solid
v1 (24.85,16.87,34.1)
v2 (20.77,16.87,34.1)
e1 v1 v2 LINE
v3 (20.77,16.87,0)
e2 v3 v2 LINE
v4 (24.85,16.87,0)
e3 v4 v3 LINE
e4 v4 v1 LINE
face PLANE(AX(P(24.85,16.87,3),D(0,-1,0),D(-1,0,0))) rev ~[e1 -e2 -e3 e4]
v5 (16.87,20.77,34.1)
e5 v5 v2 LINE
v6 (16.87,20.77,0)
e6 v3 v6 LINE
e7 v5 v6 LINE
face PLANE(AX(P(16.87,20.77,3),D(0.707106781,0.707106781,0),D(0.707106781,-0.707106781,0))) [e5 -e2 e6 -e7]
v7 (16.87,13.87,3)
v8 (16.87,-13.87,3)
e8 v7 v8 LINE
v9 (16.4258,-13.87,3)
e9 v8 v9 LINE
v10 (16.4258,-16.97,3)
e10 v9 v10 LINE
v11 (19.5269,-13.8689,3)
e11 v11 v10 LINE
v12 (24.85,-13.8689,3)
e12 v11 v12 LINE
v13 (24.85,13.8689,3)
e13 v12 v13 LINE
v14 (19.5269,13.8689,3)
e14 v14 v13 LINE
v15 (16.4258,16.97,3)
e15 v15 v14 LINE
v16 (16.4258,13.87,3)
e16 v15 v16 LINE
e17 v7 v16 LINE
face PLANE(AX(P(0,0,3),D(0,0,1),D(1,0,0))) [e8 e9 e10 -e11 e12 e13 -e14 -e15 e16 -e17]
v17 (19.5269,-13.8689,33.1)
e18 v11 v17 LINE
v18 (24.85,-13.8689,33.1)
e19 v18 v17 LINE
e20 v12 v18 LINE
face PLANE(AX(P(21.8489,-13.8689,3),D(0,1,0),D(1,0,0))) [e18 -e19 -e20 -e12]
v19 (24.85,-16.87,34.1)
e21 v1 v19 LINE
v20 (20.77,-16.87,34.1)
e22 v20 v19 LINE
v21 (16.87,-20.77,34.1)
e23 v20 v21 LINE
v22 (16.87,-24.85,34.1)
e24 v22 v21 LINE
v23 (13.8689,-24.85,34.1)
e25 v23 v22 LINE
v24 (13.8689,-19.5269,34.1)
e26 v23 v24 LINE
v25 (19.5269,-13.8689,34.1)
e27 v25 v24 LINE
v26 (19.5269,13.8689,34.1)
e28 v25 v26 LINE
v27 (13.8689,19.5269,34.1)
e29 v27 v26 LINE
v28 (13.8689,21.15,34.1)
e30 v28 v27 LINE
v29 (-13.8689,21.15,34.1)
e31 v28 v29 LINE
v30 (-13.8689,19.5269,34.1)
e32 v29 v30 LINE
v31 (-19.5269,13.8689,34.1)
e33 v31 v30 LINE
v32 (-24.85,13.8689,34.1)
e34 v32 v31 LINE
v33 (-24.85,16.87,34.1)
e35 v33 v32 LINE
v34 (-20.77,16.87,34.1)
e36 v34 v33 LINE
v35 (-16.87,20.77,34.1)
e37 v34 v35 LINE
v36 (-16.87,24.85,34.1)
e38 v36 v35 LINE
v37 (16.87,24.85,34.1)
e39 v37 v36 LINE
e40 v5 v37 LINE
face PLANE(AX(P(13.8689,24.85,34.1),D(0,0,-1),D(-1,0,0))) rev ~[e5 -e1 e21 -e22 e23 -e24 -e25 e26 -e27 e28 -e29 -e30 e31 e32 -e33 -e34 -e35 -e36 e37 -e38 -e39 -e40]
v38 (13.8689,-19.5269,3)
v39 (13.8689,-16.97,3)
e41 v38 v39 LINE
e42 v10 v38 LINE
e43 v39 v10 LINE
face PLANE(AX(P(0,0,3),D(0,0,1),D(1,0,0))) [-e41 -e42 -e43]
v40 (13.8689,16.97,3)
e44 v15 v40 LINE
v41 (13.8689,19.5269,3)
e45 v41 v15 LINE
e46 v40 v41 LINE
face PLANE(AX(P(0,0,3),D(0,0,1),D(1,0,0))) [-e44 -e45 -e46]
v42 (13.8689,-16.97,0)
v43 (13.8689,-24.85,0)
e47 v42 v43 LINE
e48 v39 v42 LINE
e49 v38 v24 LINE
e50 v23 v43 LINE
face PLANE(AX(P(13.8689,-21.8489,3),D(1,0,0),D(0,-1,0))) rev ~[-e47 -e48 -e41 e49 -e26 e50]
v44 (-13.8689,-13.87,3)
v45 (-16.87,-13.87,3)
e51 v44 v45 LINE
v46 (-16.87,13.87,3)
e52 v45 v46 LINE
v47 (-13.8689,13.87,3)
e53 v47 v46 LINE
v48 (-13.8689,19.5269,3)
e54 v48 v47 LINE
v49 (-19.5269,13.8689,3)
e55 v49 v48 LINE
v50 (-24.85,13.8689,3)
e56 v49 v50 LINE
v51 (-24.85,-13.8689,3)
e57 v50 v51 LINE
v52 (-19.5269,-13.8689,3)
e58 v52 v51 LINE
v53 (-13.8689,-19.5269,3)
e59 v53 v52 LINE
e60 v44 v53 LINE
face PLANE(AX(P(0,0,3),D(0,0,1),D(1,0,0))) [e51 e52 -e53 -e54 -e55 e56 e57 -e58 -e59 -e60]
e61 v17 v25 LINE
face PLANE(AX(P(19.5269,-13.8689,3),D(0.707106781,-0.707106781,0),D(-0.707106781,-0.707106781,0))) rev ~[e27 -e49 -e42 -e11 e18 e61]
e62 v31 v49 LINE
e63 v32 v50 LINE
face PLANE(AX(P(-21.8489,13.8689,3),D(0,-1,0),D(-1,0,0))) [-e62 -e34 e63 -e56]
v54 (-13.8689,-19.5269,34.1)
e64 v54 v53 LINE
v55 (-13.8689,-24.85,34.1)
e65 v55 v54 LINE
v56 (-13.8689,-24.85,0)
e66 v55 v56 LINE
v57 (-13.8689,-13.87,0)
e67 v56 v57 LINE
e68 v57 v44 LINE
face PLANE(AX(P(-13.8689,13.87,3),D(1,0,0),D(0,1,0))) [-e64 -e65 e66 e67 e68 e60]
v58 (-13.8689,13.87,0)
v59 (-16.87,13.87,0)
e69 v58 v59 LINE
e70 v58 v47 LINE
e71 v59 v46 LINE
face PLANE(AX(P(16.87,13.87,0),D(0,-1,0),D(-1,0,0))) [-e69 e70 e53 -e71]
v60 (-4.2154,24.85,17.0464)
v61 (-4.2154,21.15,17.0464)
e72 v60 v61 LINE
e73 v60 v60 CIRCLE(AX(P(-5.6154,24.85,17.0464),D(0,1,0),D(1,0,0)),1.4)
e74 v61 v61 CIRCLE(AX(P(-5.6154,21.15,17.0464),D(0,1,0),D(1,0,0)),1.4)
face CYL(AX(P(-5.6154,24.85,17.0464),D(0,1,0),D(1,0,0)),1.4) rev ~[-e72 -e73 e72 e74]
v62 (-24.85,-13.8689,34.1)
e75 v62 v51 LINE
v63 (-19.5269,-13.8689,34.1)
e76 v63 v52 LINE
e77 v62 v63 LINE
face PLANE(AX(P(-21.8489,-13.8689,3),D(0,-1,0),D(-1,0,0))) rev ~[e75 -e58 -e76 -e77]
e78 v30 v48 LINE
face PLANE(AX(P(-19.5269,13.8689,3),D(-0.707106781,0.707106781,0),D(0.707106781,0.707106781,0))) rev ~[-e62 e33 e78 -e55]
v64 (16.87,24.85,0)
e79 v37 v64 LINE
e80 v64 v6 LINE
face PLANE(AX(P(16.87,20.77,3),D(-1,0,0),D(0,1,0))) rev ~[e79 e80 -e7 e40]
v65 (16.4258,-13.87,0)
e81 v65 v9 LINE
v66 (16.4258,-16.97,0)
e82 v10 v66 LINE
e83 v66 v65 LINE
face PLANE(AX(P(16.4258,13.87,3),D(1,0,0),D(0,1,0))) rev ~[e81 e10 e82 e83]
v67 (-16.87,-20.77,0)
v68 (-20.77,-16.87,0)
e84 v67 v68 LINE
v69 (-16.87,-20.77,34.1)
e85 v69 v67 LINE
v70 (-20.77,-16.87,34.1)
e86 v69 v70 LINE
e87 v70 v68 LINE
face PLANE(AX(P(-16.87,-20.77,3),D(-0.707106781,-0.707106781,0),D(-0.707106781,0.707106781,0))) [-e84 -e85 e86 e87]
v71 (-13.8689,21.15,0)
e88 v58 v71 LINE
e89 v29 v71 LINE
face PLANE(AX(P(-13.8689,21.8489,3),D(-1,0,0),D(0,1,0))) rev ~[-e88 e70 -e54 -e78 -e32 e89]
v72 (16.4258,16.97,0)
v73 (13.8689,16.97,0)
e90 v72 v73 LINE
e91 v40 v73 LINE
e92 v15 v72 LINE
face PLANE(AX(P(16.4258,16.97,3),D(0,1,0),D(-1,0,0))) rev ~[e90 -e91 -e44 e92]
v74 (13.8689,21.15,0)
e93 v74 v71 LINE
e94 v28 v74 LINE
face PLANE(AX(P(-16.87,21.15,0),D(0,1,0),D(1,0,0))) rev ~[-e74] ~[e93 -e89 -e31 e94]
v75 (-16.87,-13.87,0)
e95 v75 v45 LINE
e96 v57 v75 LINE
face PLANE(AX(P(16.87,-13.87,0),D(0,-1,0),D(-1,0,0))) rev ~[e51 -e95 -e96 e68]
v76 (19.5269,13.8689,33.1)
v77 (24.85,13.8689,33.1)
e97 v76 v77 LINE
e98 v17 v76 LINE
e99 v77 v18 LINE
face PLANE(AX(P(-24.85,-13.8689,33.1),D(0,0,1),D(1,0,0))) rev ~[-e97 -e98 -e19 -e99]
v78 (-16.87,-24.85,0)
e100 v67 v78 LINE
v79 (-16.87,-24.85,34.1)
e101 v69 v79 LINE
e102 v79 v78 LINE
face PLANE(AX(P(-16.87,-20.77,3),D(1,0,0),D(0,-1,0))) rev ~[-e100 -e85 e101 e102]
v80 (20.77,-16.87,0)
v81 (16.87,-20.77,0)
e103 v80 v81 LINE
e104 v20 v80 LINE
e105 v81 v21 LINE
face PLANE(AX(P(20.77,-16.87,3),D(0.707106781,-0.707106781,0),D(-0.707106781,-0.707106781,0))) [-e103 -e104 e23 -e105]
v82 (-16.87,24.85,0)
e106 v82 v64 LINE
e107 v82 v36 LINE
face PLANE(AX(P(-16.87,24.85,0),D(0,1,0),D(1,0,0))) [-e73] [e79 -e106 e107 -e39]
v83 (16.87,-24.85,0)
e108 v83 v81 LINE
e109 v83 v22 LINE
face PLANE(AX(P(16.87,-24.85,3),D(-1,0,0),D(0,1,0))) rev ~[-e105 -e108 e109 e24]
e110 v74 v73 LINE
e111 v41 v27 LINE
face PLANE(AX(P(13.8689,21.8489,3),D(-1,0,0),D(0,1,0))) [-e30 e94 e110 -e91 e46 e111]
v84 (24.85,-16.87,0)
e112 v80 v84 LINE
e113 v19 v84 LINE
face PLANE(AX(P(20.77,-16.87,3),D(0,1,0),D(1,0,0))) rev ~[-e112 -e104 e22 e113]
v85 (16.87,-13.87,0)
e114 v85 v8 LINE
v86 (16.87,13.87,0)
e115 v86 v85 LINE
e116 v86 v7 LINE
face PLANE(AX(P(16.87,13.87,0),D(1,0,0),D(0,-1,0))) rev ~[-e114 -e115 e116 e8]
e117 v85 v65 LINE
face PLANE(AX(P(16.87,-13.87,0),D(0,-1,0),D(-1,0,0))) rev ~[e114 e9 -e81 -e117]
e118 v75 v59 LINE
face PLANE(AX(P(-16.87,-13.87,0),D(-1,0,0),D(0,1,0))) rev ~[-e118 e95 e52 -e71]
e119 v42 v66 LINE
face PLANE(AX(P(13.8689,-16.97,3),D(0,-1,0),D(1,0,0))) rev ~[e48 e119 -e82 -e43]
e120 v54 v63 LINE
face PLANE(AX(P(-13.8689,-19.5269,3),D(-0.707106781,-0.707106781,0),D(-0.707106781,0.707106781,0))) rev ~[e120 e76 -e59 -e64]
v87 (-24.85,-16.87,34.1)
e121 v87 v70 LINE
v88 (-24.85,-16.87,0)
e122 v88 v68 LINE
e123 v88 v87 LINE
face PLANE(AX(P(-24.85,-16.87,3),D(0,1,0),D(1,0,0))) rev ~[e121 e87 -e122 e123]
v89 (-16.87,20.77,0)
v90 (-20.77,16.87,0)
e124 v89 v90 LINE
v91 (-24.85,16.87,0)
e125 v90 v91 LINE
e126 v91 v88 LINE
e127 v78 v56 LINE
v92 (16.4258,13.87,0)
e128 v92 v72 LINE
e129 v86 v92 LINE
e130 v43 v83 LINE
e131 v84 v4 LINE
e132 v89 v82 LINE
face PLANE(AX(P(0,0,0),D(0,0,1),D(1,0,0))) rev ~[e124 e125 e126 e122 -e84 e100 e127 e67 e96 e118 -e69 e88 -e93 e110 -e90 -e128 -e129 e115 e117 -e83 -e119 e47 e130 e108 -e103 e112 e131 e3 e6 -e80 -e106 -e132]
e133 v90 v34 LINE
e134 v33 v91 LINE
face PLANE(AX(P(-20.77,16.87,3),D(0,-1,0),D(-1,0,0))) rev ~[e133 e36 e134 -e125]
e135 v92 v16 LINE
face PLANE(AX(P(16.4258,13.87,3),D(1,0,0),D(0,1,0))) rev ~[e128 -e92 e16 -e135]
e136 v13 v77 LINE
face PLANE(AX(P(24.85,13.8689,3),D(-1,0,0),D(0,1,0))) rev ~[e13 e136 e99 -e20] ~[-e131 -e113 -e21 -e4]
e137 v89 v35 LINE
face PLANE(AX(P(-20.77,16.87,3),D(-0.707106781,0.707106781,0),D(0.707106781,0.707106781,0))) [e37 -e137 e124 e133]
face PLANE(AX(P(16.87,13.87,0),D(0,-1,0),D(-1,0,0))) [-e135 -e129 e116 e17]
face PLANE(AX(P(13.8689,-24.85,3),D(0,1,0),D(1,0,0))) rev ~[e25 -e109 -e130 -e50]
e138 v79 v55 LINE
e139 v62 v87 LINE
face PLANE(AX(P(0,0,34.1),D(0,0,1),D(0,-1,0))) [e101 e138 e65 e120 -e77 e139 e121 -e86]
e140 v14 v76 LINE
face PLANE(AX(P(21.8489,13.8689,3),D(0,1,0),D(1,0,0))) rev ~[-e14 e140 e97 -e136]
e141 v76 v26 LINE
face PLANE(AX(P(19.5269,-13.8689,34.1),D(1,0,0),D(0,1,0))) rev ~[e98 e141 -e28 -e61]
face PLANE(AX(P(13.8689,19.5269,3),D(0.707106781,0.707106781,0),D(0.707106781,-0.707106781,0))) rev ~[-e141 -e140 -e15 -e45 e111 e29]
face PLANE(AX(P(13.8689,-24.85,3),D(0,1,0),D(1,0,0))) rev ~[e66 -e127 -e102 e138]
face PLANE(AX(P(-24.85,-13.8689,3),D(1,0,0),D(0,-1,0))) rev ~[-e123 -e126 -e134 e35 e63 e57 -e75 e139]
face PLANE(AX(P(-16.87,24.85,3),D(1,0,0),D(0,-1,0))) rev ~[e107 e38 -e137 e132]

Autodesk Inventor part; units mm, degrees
ref_plane "Work Plane1" through (0, 0, 0) normal (0, 0, 1) x (1, 0, 0)
sketch "Sketch1" plane through (0, 0, 0) normal (0, 0, 1) x (1, 0, 0)
  arc A0 (12.5934, -5.8404) -> (12.8401, -5.9947) centre (12.8241, -5.7459) ccw construction
  line L0 (12.8401, -5.9947) -> (16.4715, -5.9947) construction
  line L1 (16.4715, -5.9947) -> (16.97, -5.4961) construction
  line L2 (16.97, -5.4961) -> (16.97, 1.583) construction
  arc A1 (16.97, 2.3806) -> (16.97, 1.583) centre (17.2691, 1.9818) ccw construction
  line L3 (16.97, 2.3806) -> (16.97, 5.4715) construction
  line L4 (16.97, 5.4715) -> (16.4715, 5.97) construction
  line L5 (16.4715, 5.97) -> (12.8401, 5.97) construction
  arc A2 (12.8401, 5.97) -> (12.6094, 5.8152) centre (12.8401, 5.7207) ccw construction
  arc A3 (12.0954, 5.2394) -> (12.6094, 5.8152) centre (11.5075, 6.2814) ccw construction
  arc A4 (12.0954, 5.2394) -> (11.974, 5.0466) centre (12.2223, 5.0248) ccw construction
  line L6 (11.974, 5.0466) -> (11.9439, 4.702) construction
  arc A5 (11.6955, 4.4744) -> (11.9439, 4.702) centre (11.6955, 4.7237) ccw construction
  line L7 (11.6955, 4.4744) -> (11.2445, 4.4744) construction
  arc A6 (10.9961, 4.702) -> (11.2445, 4.4744) centre (11.2445, 4.7237) ccw construction
  line L8 (10.9961, 4.702) -> (10.9642, 5.0674) construction
  arc A7 (10.9642, 5.0674) -> (10.8487, 5.2566) centre (10.7158, 5.0457) ccw construction
  arc A8 (10.3792, 5.8152) -> (10.8487, 5.2566) centre (11.4862, 6.2691) ccw construction
  arc A9 (10.3792, 5.8152) -> (10.1485, 5.97) centre (10.1485, 5.7206) ccw construction
  line L9 (10.1485, 5.97) -> (9.4685, 5.97) construction
  line L10 (9.4685, 5.97) -> (8.97, 5.4715) construction
  line L11 (8.97, 5.4715) -> (8.97, -5.4961) construction
  line L12 (8.97, -5.4961) -> (9.4685, -5.9947) construction
  line L13 (9.4685, -5.9947) -> (10.1412, -5.9947) construction
  arc A10 (10.1412, -5.9947) -> (10.3791, -5.84) centre (10.1485, -5.7455) ccw construction
  arc A11 (10.8487, -5.2813) -> (10.3791, -5.84) centre (11.4862, -6.2938) ccw construction
  arc A12 (10.8487, -5.2813) -> (10.9642, -5.0921) centre (10.7158, -5.0704) ccw construction
  line L14 (10.9642, -5.0921) -> (10.9961, -4.7266) construction
  arc A13 (11.2445, -4.4991) -> (10.9961, -4.7266) centre (11.2445, -4.7483) ccw construction
  line L15 (11.2445, -4.4991) -> (11.6955, -4.4991) construction
  arc A14 (11.9439, -4.7266) -> (11.6955, -4.4991) centre (11.6955, -4.7483) ccw construction
  line L16 (11.9439, -4.7266) -> (11.974, -5.0712) construction
  arc A15 (11.974, -5.0712) -> (12.0954, -5.264) centre (12.2223, -5.0495) ccw construction
  arc A16 (12.5934, -5.8404) -> (12.0954, -5.264) centre (11.4862, -6.2938) ccw construction
  arc A17 (24.85, 22.85) -> (22.85, 24.85) centre (22.85, 22.85) ccw construction
  line L17 (22.85, 24.85) -> (-16.97, 24.85) construction
  line L18 (-16.97, 24.85) -> (-16.97, 21.15) construction
  line L19 (-16.97, 21.15) -> (16.97, 21.15) construction
  line L20 (16.97, 16.97) -> (16.97, 21.15) construction
  line L21 (21.15, 16.97) -> (16.97, 16.97) construction
  line L22 (21.15, 16.97) -> (21.15, -16.97) construction
  line L23 (21.15, -16.97) -> (24.85, -16.97) construction
  line L24 (24.85, -16.97) -> (24.85, 22.85) construction
  line L25 (23.75, 23.25) -> (23.75, 18.15) construction
  arc A18 (23.25, 17.65) -> (23.75, 18.15) centre (23.25, 18.15) ccw construction
  line L26 (23.25, 17.65) -> (20.8937, 17.65) construction
  arc A19 (20.5239, 17.8134) -> (20.8937, 17.65) centre (20.8937, 18.15) ccw construction
  line L27 (20.5239, 17.8134) -> (17.7803, 20.8273) construction
  arc A20 (17.65, 21.1639) -> (17.7803, 20.8273) centre (18.15, 21.1639) ccw construction
  line L28 (17.65, 21.1639) -> (17.65, 23.25) construction
  arc A21 (18.15, 23.75) -> (17.65, 23.25) centre (18.15, 23.25) ccw construction
  line L29 (18.15, 23.75) -> (23.25, 23.75) construction
  arc A22 (23.75, 23.25) -> (23.25, 23.75) centre (23.25, 23.25) ccw construction
  arc A23 (-24.85, -22.85) -> (-22.85, -24.85) centre (-22.85, -22.85) ccw construction
  line L30 (-22.85, -24.85) -> (16.97, -24.85) construction
  line L31 (16.97, -24.85) -> (16.97, -21.15) construction
  line L32 (16.97, -21.15) -> (-16.97, -21.15) construction
  line L33 (-16.97, -16.97) -> (-16.97, -21.15) construction
  line L34 (-21.15, -16.97) -> (-16.97, -16.97) construction
  line L35 (-21.15, -16.97) -> (-21.15, 16.97) construction
  line L36 (-21.15, 16.97) -> (-24.85, 16.97) construction
  line L37 (-24.85, 16.97) -> (-24.85, -22.85) construction
  line L38 (-20.8273, -17.7803) -> (-17.8134, -20.5239) construction
  arc A24 (-17.65, -20.8937) -> (-17.8134, -20.5239) centre (-18.15, -20.8937) ccw construction
  line L39 (-17.65, -20.8937) -> (-17.65, -23.25) construction
  arc A25 (-18.15, -23.75) -> (-17.65, -23.25) centre (-18.15, -23.25) ccw construction
  line L40 (-18.15, -23.75) -> (-23.25, -23.75) construction
  arc A26 (-23.75, -23.25) -> (-23.25, -23.75) centre (-23.25, -23.25) ccw construction
  line L41 (-23.75, -23.25) -> (-23.75, -18.15) construction
  arc A27 (-23.25, -17.65) -> (-23.75, -18.15) centre (-23.25, -18.15) ccw construction
  line L42 (-23.25, -17.65) -> (-21.1639, -17.65) construction
  arc A28 (-20.8273, -17.7803) -> (-21.1639, -17.65) centre (-21.1639, -18.15) ccw construction
  arc A29 (-22.85, 24.85) -> (-24.85, 22.85) centre (-22.85, 22.85) ccw construction
  line L43 (-22.85, 24.85) -> (16.97, 24.85) construction
  line L44 (16.97, 24.85) -> (16.97, 21.15) construction
  line L45 (16.97, 21.15) -> (-16.97, 21.15) construction
  line L46 (-16.97, 16.97) -> (-16.97, 21.15) construction
  line L47 (-21.15, 16.97) -> (-16.97, 16.97) construction
  line L48 (-21.15, 16.97) -> (-21.15, -16.97) construction
  line L49 (-21.15, -16.97) -> (-24.85, -16.97) construction
  line L50 (-24.85, -16.97) -> (-24.85, 22.85) construction
  line L51 (-20.8273, 17.7803) -> (-17.8134, 20.5239) construction
  arc A30 (-17.8134, 20.5239) -> (-17.65, 20.8937) centre (-18.15, 20.8937) ccw construction
  line L52 (-17.65, 20.8937) -> (-17.65, 23.25) construction
  arc A31 (-17.65, 23.25) -> (-18.15, 23.75) centre (-18.15, 23.25) ccw construction
  line L53 (-18.15, 23.75) -> (-23.25, 23.75) construction
  arc A32 (-23.25, 23.75) -> (-23.75, 23.25) centre (-23.25, 23.25) ccw construction
  line L54 (-23.75, 23.25) -> (-23.75, 18.15) construction
  arc A33 (-23.75, 18.15) -> (-23.25, 17.65) centre (-23.25, 18.15) ccw construction
  line L55 (-23.25, 17.65) -> (-21.1639, 17.65) construction
  arc A34 (-21.1639, 17.65) -> (-20.8273, 17.7803) centre (-21.1639, 18.15) ccw construction
  arc A35 (22.85, -24.85) -> (24.85, -22.85) centre (22.85, -22.85) ccw construction
  line L56 (22.85, -24.85) -> (-16.97, -24.85) construction
  line L57 (-16.97, -24.85) -> (-16.97, -21.15) construction
  line L58 (-16.97, -21.15) -> (16.97, -21.15) construction
  line L59 (16.97, -16.97) -> (16.97, -21.15) construction
  line L60 (21.15, -16.97) -> (16.97, -16.97) construction
  line L61 (21.15, -16.97) -> (21.15, 16.97) construction
  line L62 (21.15, 16.97) -> (24.85, 16.97) construction
  line L63 (24.85, 16.97) -> (24.85, -22.85) construction
  line L64 (23.75, -23.25) -> (23.75, -18.15) construction
  arc A36 (23.75, -18.15) -> (23.25, -17.65) centre (23.25, -18.15) ccw construction
  line L65 (23.25, -17.65) -> (20.8937, -17.65) construction
  arc A37 (20.8937, -17.65) -> (20.5239, -17.8134) centre (20.8937, -18.15) ccw construction
  line L66 (20.5239, -17.8134) -> (17.7803, -20.8273) construction
  arc A38 (17.7803, -20.8273) -> (17.65, -21.1639) centre (18.15, -21.1639) ccw construction
  line L67 (17.65, -21.1639) -> (17.65, -23.25) construction
  arc A39 (17.65, -23.25) -> (18.15, -23.75) centre (18.15, -23.25) ccw construction
  line L68 (18.15, -23.75) -> (23.25, -23.75) construction
  arc A40 (23.25, -23.75) -> (23.75, -23.25) centre (23.25, -23.25) ccw construction
  circle A41 centre (0.47, -10.47) radius 1.1 construction
  circle A42 centre (0.47, 12.53) radius 1.025 construction
  line L69 (24.85, 16.87) -> (16.87, 16.87)
  line L70 (16.87, 16.87) -> (16.87, -16.87)
  line L71 (16.87, -16.87) -> (24.85, -16.87)
  line L72 (24.85, -16.87) -> (24.85, 16.87)
  line L73 (-16.87, 24.85) -> (16.87, 24.85)
  line L74 (16.87, 24.85) -> (16.87, 13.87)
  line L75 (16.87, 13.87) -> (-16.87, 13.87)
  line L76 (-16.87, 13.87) -> (-16.87, 24.85)
  line L77 (-16.87, 16.87) -> (-24.85, 16.87)
  line L78 (-24.85, 16.87) -> (-24.85, -16.87)
  line L79 (-24.85, -16.87) -> (-16.87, -16.87)
  line L80 (-16.87, -16.87) -> (-16.87, 16.87)
  line L81 (-16.87, -24.85) -> (16.87, -24.85)
  line L82 (16.87, -24.85) -> (16.87, -13.87)
  line L83 (16.87, -13.87) -> (-16.87, -13.87)
  line L84 (-16.87, -13.87) -> (-16.87, -24.85)
  point P0 (0, 0)
extrude "Extrusion1" add sketch "Sketch1" along normal blind 3 contours L72 L71 L70 L69 | L70 L75 L76 L73 L74 | L82 L81 L84 L80 L83 L70 | L80 L79 L78 L77 L76
chamfer "Chamfer1" distance 3.9 angle 45 4 edges at (16.87, -16.87, 1.5) (-16.87, -16.87, 1.5) (-16.87, 16.87, 1.5) (16.87, 16.87, 1.5)
sketch "Sketch2" plane through (0, 0, 3) normal (0, 0, 1) x (1, 0, 0)
  line L0 (-16.87, -13.87) -> (-16.87, 13.87) projected
  line L1 (-16.87, 13.87) -> (16.87, 13.87) projected
  line L2 (16.87, 13.87) -> (16.87, -13.87) projected
  line L3 (16.87, -13.87) -> (-16.87, -13.87) projected
  line L4 (-16.87, -20.77) -> (-16.87, -24.85) projected
  line L5 (-16.87, -24.85) -> (16.87, -24.85) projected
  line L6 (16.87, -24.85) -> (16.87, -20.77) projected
  line L7 (20.77, -16.87) -> (16.87, -20.77) projected
  line L8 (20.77, -16.87) -> (24.85, -16.87) projected
  line L9 (24.85, -16.87) -> (24.85, 16.87) projected
  line L10 (24.85, 16.87) -> (20.77, 16.87) projected
  line L11 (16.87, 20.77) -> (20.77, 16.87) projected
  line L12 (16.87, 20.77) -> (16.87, 24.85) projected
  line L13 (16.87, 24.85) -> (-16.87, 24.85) projected
  line L14 (-16.87, 24.85) -> (-16.87, 20.77) projected
  line L15 (-20.77, 16.87) -> (-16.87, 20.77) projected
  line L16 (-20.77, 16.87) -> (-24.85, 16.87) projected
  line L17 (-24.85, 16.87) -> (-24.85, -16.87) projected
  line L18 (-24.85, -16.87) -> (-20.77, -16.87) projected
  line L19 (-16.87, -20.77) -> (-20.77, -16.87) projected
  line L20 (13.8689, -19.5269) -> (13.8689, -21.8489)
  line L21 (-13.8689, -21.8489) -> (-13.8689, -19.5269)
  line L22 (-13.8689, -19.5269) -> (-19.5269, -13.8689)
  line L23 (-19.5269, -13.8689) -> (-21.8489, -13.8689)
  line L24 (-21.8489, 13.8689) -> (-19.5269, 13.8689)
  line L25 (-19.5269, 13.8689) -> (-13.8689, 19.5269)
  line L26 (-13.8689, 19.5269) -> (-13.8689, 21.8489)
  line L27 (13.8689, 21.8489) -> (13.8689, 19.5269)
  line L28 (13.8689, 19.5269) -> (19.5269, 13.8689)
  line L29 (19.5269, 13.8689) -> (21.8489, 13.8689)
  line L30 (21.8489, -13.8689) -> (19.5269, -13.8689)
  line L31 (19.5269, -13.8689) -> (13.8689, -19.5269)
  line L32 (13.8689, -21.8489) -> (13.8689, -24.85)
  line L33 (16.87, -24.85) -> (-16.87, -24.85) projected
  line L34 (21.8489, -13.8689) -> (24.85, -13.8689)
  line L35 (24.85, -16.87) -> (24.85, 16.87) projected
  line L36 (21.8489, 13.8689) -> (24.85, 13.8689)
  line L37 (13.8689, 21.8489) -> (13.8689, 24.85)
  line L38 (-13.8689, 21.8489) -> (-13.8689, 24.85)
  line L39 (-21.8489, 13.8689) -> (-24.85, 13.8689)
  line L40 (-21.8489, -13.8689) -> (-24.85, -13.8689)
  line L41 (-13.8689, -21.8489) -> (-13.8689, -24.85)
  line L42 (13.8689, -21.8489) -> (11.5469, -21.8489)
  line L43 (-11.5469, -21.8489) -> (-13.8689, -21.8489)
  line L44 (21.8489, 13.8689) -> (21.8489, 11.5469)
  line L45 (21.8489, -11.5469) -> (21.8489, -13.8689)
  line L46 (-21.8489, -13.8689) -> (-21.8489, -11.5469)
  line L47 (-21.8489, 11.5469) -> (-21.8489, 13.8689)
  line L48 (-13.8689, 21.8489) -> (-11.5469, 21.8489)
  line L49 (11.5469, 21.8489) -> (13.8689, 21.8489)
  point P0 (0, 0)
  dimension "d13" = 3.0011
ref_plane "Work Plane2" through (-16.97, -24.85, 34.1) normal (0, 0, -1) x (0, 1, 0)
extrude "Extrusion2" add sketch "Sketch2" along normal up to surface (31.1 mm away) contours L32 L20 L31 L30 L34 L9 L8 L7 L6 L5
pattern_circular "Circular Pattern1" count 4 over 360 about axis through (0, 0, 17.13) along (0, 0, -1) of "Extrusion2"
sketch "Sketch3" plane through (-24.85, -13.8689, 34.1) normal (0, 0, 1) x (1, 0, 0)
  circle A0 centre (13.82, 14.8989) radius 1.5 projected
  line L0 (10.9811, -5.658) -> (5.3231, 0) projected
  line L1 (5.3231, 0) -> (0, 0) projected
  line L2 (0, 0) -> (0, -3.0011) projected
  line L3 (0, -3.0011) -> (4.08, -3.0011) projected
  line L4 (4.08, -3.0011) -> (7.98, -6.9011) projected
  line L5 (7.98, -6.9011) -> (7.98, -10.9811) projected
  line L6 (7.98, -10.9811) -> (10.9811, -10.9811) projected
  line L7 (10.9811, -10.9811) -> (10.9811, -5.658) projected
  line L8 (5.3231, 27.7378) -> (10.9811, 33.3958) projected
  line L9 (10.9811, 33.3958) -> (10.9811, 38.7189) projected
  line L10 (10.9811, 38.7189) -> (7.98, 38.7189) projected
  line L11 (7.98, 38.7189) -> (7.98, 34.6389) projected
  line L12 (7.98, 34.6389) -> (4.08, 30.7389) projected
  line L13 (4.08, 30.7389) -> (0, 30.7389) projected
  line L14 (0, 30.7389) -> (0, 27.7378) projected
  line L15 (0, 27.7378) -> (5.3231, 27.7378) projected
  line L16 (10.9811, -10.9811) -> (16.9811, -10.9811)
  line L17 (16.9811, 38.7189) -> (10.9811, 38.7189)
  line L18 (0, 0) -> (0, 27.7378)
  line L19 (0, 0) -> (5.3231, 0)
  line L20 (5.3231, 0) -> (5.3231, 27.7378)
  line L21 (5.3231, 27.7378) -> (0, 27.7378)
  line L22 (0, 27.7378) -> (0, 0)
  line L23 (5.3231, 0) -> (0, 0) projected
  line L24 (5.3231, 0) -> (10.9811, -5.658)
  line L25 (10.9811, 33.3958) -> (5.3231, 27.7378)
  line L26 (38.7189, 38.7189) -> (38.7189, 33.3958) projected
  line L27 (38.7189, -5.658) -> (38.7189, -10.9811) projected
  line L28 (10.9811, -10.9811) -> (38.7189, -10.9811)
  line L29 (38.7189, -10.9811) -> (38.7189, -5.658)
  line L30 (38.7189, -5.658) -> (10.9811, -5.658)
  line L31 (10.9811, -5.658) -> (10.9811, -10.9811)
  line L32 (10.9811, 38.7189) -> (10.9811, 33.3958) projected
  line L33 (10.9811, 38.7189) -> (38.7189, 38.7189)
  line L34 (38.7189, 38.7189) -> (38.7189, 33.3958)
  line L35 (38.7189, 33.3958) -> (10.9811, 33.3958)
  line L36 (10.9811, 33.3958) -> (10.9811, 38.7189)
  line L37 (16.9811, -10.9811) -> (16.9811, -5.658)
  line L38 (16.9811, 33.3958) -> (16.9811, 38.7189)
  line L39 (10.9811, 38.7189) -> (10.9811, 33.3958)
  line L40 (10.9811, -5.658) -> (10.9811, -10.9811)
  line L41 (10.9811, -5.658) -> (10.9811, 0)
  line L42 (10.9811, 27.7378) -> (10.9811, 33.3958)
  line L43 (49.7, 0) -> (44.3769, 0) projected
  line L44 (44.3769, 27.7378) -> (49.7, 27.7378) projected
  line L45 (44.3769, 27.7378) -> (49.7, 27.7378)
  line L46 (49.7, 27.7378) -> (49.7, 0)
  line L47 (49.7, 0) -> (44.3769, 0)
  line L48 (44.3769, 0) -> (44.3769, 27.7378)
  point P0 (24.85, 13.8689)
  dimension "d19" = 6
extrude "Extrusion3" add sketch "Sketch3" against normal blind 1 contours L7 L6 L5 L4 L3 L2 L1 L0 | L15 L14 L13 L12 L11 L10 L9 L8 | L43 L48 L44 L46
sketch "Sketch4" plane through (24.85, -16.87, 0) normal (1, 0, 0) x (0, 0, -1)
  line L0 (37.9, 11.3739) -> (37.9, 18.453) construction
  line L1 (23.6194, 18.453) -> (37.9, 18.453) construction
  arc A0 (22.1806, 18.453) -> (23.6194, 18.453) centre (22.9, 16.8577) ccw construction
  line L2 (-1.3806, 18.453) -> (22.1806, 18.453) construction
  arc A1 (-2.8194, 18.453) -> (-1.3806, 18.453) centre (-2.1, 16.8577) ccw construction
  line L3 (-31.3806, 18.453) -> (-2.8194, 18.453) construction
  arc A2 (-32.8194, 18.453) -> (-31.3806, 18.453) centre (-32.1, 16.8577) ccw construction
  line L4 (-42.1, 18.453) -> (-32.8194, 18.453) construction
  line L5 (-42.1, 11.3739) -> (-42.1, 18.453) construction
  line L6 (-42.1, 11.3739) -> (37.9, 11.3739) construction
  line L7 (37.9, 19.2506) -> (37.9, 22.3415) construction
  line L8 (-42.1, 22.3415) -> (37.9, 22.3415) construction
  line L9 (-42.1, 19.2506) -> (-42.1, 22.3415) construction
  line L10 (-42.1, 19.2506) -> (37.9, 19.2506) construction
  line L11 (-3, 3.0011) -> (-3, 30.7389) construction
  line L12 (-34.1, 33.84) -> (-34.1, -5.98) construction
  line L13 (-3, 11.3739) -> (-34.1, 11.3739)
  line L14 (-34.1, 11.3739) -> (-34.1, 22.3415)
  line L15 (-34.1, 22.3415) -> (-3, 22.3415)
  line L16 (-3, 22.3415) -> (-3, 11.3739)
  line L17 (-34.1, 11.3739) -> (-32.1, 11.3739)
  line L18 (-32.1, 11.3739) -> (-32.1, 3.0011)
  line L19 (-32.1, 3.0011) -> (-34.1, 3.0011)
  line L20 (-34.1, 3.0011) -> (-34.1, 11.3739)
  line L21 (-34.1, 22.3415) -> (-32.1, 22.3415)
  line L22 (-32.1, 22.3415) -> (-32.1, 30.7389)
  line L23 (-32.1, 30.7389) -> (-34.1, 30.7389)
  line L24 (-34.1, 30.7389) -> (-34.1, 22.3415)
  point P0 (0, 16.87)
  dimension "d24" = 2
ref_plane "Work Plane3" through (16.97, -5.4961, -37.9) normal (1, 0, 0) x (0, 1, 0)
sketch "Sketch7" plane through (0, 0, 0) normal (0, 0, -1) x (-1, 0, 0)
  arc A0 (18.93, 12.43) -> (22.43, 8.93) centre (22.43, 12.43) ccw construction
  line L0 (18.93, 12.43) -> (18.93, 14.53) construction
  line L1 (3.13, 14.53) -> (18.93, 14.53) construction
  line L2 (3.13, 14.53) -> (3.13, 12.43) construction
  arc A1 (-0.37, 8.93) -> (3.13, 12.43) centre (-0.37, 12.43) ccw construction
  line L3 (-0.37, 8.93) -> (-2.47, 8.93) construction
  line L4 (-2.47, -6.87) -> (-2.47, 8.93) construction
  line L5 (-2.47, -6.87) -> (-0.37, -6.87) construction
  arc A2 (3.13, -10.37) -> (-0.37, -6.87) centre (-0.37, -10.37) ccw construction
  line L6 (3.13, -10.37) -> (3.13, -12.47) construction
  line L7 (18.93, -12.47) -> (3.13, -12.47) construction
  line L8 (18.93, -12.47) -> (18.93, -10.37) construction
  arc A3 (22.43, -6.87) -> (18.93, -10.37) centre (22.43, -10.37) ccw construction
  line L9 (22.43, -6.87) -> (24.53, -6.87) construction
  line L10 (24.53, 8.93) -> (24.53, -6.87) construction
  line L11 (24.53, 8.93) -> (22.43, 8.93) construction
  circle A4 centre (11.03, 1.03) radius 2.5 construction
  arc A5 (-1.5344, 11.2045) -> (0.934, 13.4886) centre (-0.47, 12.53) ccw construction
  circle A6 centre (-0.47, -10.47) radius 1.1 construction
  arc A7 (0.5944, 13.8555) -> (-1.874, 11.5714) centre (-0.47, 12.53) ccw construction
  line L12 (-19.5269, -13.8689) -> (-24.85, -13.8689) construction
  line L13 (-16.87, 13.87) -> (-16.87, -13.87) construction
  line L14 (-16.87, -13.87) -> (16.87, -13.87) construction
  line L15 (16.87, -13.87) -> (16.87, 13.87) construction
  line L16 (16.87, 13.87) -> (-16.87, 13.87) construction
  line L17 (-19.5269, 13.8689) -> (-13.8689, 19.5269) construction
  line L18 (-13.8689, 19.5269) -> (-13.8689, 24.85) construction
  line L19 (-13.8689, 24.85) -> (13.8689, 24.85) construction
  line L20 (13.8689, 24.85) -> (13.8689, 19.5269) construction
  line L21 (13.8689, 19.5269) -> (19.5269, 13.8689) construction
  line L22 (19.5269, 13.8689) -> (24.85, 13.8689) construction
  line L23 (24.85, 13.8689) -> (24.85, -13.8689) construction
  line L24 (24.85, -13.8689) -> (19.5269, -13.8689) construction
  line L25 (19.5269, -13.8689) -> (13.8689, -19.5269) construction
  line L26 (13.8689, -19.5269) -> (13.8689, -24.85) construction
  line L27 (13.8689, -24.85) -> (-13.8689, -24.85) construction
  line L28 (-13.8689, -24.85) -> (-13.8689, -19.5269) construction
  line L29 (-13.8689, -19.5269) -> (-19.5269, -13.8689) construction
  line L30 (16.87, 13.87) -> (-16.87, 13.87) construction
  line L31 (16.87, 13.87) -> (-19.5258, 13.87) projected
  line L32 (-2.13, 13.87) -> (16.87, 13.87)
  line L33 (16.87, 13.87) -> (16.87, -16.45)
  line L34 (16.87, -16.45) -> (-2.13, -16.45)
  line L35 (-2.13, -16.45) -> (-2.13, 13.87)
  line L36 (16.97, 16.97) -> (-16.97, 16.97)
  line L37 (16.87, 13.87) -> (-2.13, 13.87)
  line L38 (-2.13, 13.87) -> (-2.13, 16.45)
  line L39 (-2.13, 16.45) -> (16.87, 16.45)
  line L40 (16.87, 16.45) -> (16.87, 13.87)
  line L41 (-16.97, -16.97) -> (16.97, -16.97) construction
  line L42 (-24.85, -13.8689) -> (-24.85, 13.8689) projected
  line L43 (-24.85, 13.8689) -> (-19.5269, 13.8689) projected
  point P0 (0, 0)
  dimension "d35" = 19
  dimension "d36" = 0
  dimension "d74" = 16.45
  dimension "d75" = 16.45
ref_plane "Work Plane4" through (-25.03, -12.97, -12) normal (0, 0, 1) x (1, 0, 0)
sketch "Sketch14" plane through (-16.87, 24.85, 0) normal (0, 1, 0) x (1, 0, 0)
  line L0 (3.0011, -3) -> (3.0011, -34.1) projected
  line L1 (30.7389, -3) -> (3.0011, -3) projected
  line L2 (30.7389, -3) -> (30.7389, -34.1) projected
  line L3 (33.74, -34.1) -> (30.7389, -34.1) projected
  line L4 (33.74, 0) -> (33.74, -34.1) projected
  line L5 (33.74, 0) -> (0, 0) projected
  line L6 (0, 0) -> (0, -34.1) projected
  line L7 (3.0011, -34.1) -> (0, -34.1) projected
  line L8 (3.0011, -3) -> (3.0011, -34.1) projected
  line L9 (30.7389, -34.1) -> (36.3969, -34.1) projected
  line L10 (3.0011, -3) -> (30.7389, -3)
  line L11 (30.7389, -3) -> (30.7389, -34.1)
  line L12 (30.7389, -34.1) -> (3.0011, -34.1)
  line L13 (3.0011, -34.1) -> (3.0011, -3)
  circle A0 centre (11.8112, -17.0464) radius 1.4 construction
  circle A1 centre (11.2546, -17.0464) radius 1.4
  point P0 (16.87, 0)
  dimension "d89" = 2.8
extrude "Extrusion12" add sketch "Sketch14" against normal up to surface (3.7 mm away) contours L1 L2 L12 L0
sketch "Sketch15" plane through (0, 0, 3) normal (0, 0, 1) x (1, 0, 0)
  line L0 (19.5269, 13.8689) -> (13.8689, 19.5269) projected
  line L1 (2.2647, -16.97) -> (16.4258, -16.97)
  line L2 (16.4258, -16.97) -> (16.4258, 16.97)
  line L3 (16.4258, 16.97) -> (2.2647, 16.97)
  line L4 (2.2647, 16.97) -> (2.2647, -16.97)
  line L5 (2.2647, -16.97) -> (16.4258, 16.97) construction
  line L6 (16.4258, -16.97) -> (2.2647, 16.97) construction
  line L7 (13.8689, -24.85) -> (13.8689, -19.5269) projected
  line L8 (13.8689, -19.5269) -> (19.5269, -13.8689) projected
  line L9 (19.5269, -13.8689) -> (24.85, -13.8689) projected
  line L10 (24.85, -13.8689) -> (24.85, 13.8689) projected
  line L11 (16.87, 13.87) -> (16.87, -13.87) projected
  line L12 (16.87, -13.87) -> (-16.87, -13.87) projected
  line L13 (-16.87, -13.87) -> (-16.87, 13.87) projected
  line L14 (-16.87, 13.87) -> (16.87, 13.87) projected
  line L15 (24.85, 13.8689) -> (19.5269, 13.8689) projected
  line L16 (19.5269, 13.8689) -> (13.8689, 19.5269) projected
  line L17 (13.8689, 19.5269) -> (13.8689, 21.15) projected
  line L18 (-13.8689, 21.15) -> (-13.8689, 19.5269) projected
  line L19 (-13.8689, 19.5269) -> (-19.5269, 13.8689) projected
  line L20 (-19.5269, 13.8689) -> (-24.85, 13.8689) projected
  line L21 (-24.85, 13.8689) -> (-24.85, -13.8689) projected
  line L22 (-24.85, -13.8689) -> (-19.5269, -13.8689) projected
  line L23 (-19.5269, -13.8689) -> (-13.8689, -19.5269) projected
  line L24 (-13.8689, -19.5269) -> (-13.8689, -24.85) projected
  line L25 (13.8689, 19.5269) -> (13.8689, -19.5269)
  line L26 (16.87, 24.85) -> (-16.87, 24.85) projected
  line L27 (-13.8689, -19.5269) -> (-19.5269, -13.8689) projected
  line L28 (-13.8689, -19.5269) -> (-13.8689, 19.5269)
  line L29 (13.8689, 21.15) -> (-13.8689, 21.15) projected
  line L30 (-13.8689, -24.85) -> (13.8689, -24.85) projected
  point P0 (0, 0)
  point P1 (9.3452, 0)
extrude "Extrusion13" cut sketch "Sketch15" against normal through all contours L2 L14 L25 L3 | L25 L3 L4 L14 L28 L18 L29 L17 | L2 L12 L25 L14 | L25 L14 L4 L3 | L2 L1 L25 L12 | L25 L12 L4 L14 | L25 L1 L4 L12 | L4 L12 L28 L14 | L25 L7 L30 L24 L28 L12 L4 L1
equation "\"d2\" = d1"
equation "\"d3\" = d1"
equation "\"d4\" = d1"
equation "\"d5\" = d1"
equation "\"d1\" = 0.1"
properties part number "30_Cube_Z_Focus_MGN_manual_base_v3"
